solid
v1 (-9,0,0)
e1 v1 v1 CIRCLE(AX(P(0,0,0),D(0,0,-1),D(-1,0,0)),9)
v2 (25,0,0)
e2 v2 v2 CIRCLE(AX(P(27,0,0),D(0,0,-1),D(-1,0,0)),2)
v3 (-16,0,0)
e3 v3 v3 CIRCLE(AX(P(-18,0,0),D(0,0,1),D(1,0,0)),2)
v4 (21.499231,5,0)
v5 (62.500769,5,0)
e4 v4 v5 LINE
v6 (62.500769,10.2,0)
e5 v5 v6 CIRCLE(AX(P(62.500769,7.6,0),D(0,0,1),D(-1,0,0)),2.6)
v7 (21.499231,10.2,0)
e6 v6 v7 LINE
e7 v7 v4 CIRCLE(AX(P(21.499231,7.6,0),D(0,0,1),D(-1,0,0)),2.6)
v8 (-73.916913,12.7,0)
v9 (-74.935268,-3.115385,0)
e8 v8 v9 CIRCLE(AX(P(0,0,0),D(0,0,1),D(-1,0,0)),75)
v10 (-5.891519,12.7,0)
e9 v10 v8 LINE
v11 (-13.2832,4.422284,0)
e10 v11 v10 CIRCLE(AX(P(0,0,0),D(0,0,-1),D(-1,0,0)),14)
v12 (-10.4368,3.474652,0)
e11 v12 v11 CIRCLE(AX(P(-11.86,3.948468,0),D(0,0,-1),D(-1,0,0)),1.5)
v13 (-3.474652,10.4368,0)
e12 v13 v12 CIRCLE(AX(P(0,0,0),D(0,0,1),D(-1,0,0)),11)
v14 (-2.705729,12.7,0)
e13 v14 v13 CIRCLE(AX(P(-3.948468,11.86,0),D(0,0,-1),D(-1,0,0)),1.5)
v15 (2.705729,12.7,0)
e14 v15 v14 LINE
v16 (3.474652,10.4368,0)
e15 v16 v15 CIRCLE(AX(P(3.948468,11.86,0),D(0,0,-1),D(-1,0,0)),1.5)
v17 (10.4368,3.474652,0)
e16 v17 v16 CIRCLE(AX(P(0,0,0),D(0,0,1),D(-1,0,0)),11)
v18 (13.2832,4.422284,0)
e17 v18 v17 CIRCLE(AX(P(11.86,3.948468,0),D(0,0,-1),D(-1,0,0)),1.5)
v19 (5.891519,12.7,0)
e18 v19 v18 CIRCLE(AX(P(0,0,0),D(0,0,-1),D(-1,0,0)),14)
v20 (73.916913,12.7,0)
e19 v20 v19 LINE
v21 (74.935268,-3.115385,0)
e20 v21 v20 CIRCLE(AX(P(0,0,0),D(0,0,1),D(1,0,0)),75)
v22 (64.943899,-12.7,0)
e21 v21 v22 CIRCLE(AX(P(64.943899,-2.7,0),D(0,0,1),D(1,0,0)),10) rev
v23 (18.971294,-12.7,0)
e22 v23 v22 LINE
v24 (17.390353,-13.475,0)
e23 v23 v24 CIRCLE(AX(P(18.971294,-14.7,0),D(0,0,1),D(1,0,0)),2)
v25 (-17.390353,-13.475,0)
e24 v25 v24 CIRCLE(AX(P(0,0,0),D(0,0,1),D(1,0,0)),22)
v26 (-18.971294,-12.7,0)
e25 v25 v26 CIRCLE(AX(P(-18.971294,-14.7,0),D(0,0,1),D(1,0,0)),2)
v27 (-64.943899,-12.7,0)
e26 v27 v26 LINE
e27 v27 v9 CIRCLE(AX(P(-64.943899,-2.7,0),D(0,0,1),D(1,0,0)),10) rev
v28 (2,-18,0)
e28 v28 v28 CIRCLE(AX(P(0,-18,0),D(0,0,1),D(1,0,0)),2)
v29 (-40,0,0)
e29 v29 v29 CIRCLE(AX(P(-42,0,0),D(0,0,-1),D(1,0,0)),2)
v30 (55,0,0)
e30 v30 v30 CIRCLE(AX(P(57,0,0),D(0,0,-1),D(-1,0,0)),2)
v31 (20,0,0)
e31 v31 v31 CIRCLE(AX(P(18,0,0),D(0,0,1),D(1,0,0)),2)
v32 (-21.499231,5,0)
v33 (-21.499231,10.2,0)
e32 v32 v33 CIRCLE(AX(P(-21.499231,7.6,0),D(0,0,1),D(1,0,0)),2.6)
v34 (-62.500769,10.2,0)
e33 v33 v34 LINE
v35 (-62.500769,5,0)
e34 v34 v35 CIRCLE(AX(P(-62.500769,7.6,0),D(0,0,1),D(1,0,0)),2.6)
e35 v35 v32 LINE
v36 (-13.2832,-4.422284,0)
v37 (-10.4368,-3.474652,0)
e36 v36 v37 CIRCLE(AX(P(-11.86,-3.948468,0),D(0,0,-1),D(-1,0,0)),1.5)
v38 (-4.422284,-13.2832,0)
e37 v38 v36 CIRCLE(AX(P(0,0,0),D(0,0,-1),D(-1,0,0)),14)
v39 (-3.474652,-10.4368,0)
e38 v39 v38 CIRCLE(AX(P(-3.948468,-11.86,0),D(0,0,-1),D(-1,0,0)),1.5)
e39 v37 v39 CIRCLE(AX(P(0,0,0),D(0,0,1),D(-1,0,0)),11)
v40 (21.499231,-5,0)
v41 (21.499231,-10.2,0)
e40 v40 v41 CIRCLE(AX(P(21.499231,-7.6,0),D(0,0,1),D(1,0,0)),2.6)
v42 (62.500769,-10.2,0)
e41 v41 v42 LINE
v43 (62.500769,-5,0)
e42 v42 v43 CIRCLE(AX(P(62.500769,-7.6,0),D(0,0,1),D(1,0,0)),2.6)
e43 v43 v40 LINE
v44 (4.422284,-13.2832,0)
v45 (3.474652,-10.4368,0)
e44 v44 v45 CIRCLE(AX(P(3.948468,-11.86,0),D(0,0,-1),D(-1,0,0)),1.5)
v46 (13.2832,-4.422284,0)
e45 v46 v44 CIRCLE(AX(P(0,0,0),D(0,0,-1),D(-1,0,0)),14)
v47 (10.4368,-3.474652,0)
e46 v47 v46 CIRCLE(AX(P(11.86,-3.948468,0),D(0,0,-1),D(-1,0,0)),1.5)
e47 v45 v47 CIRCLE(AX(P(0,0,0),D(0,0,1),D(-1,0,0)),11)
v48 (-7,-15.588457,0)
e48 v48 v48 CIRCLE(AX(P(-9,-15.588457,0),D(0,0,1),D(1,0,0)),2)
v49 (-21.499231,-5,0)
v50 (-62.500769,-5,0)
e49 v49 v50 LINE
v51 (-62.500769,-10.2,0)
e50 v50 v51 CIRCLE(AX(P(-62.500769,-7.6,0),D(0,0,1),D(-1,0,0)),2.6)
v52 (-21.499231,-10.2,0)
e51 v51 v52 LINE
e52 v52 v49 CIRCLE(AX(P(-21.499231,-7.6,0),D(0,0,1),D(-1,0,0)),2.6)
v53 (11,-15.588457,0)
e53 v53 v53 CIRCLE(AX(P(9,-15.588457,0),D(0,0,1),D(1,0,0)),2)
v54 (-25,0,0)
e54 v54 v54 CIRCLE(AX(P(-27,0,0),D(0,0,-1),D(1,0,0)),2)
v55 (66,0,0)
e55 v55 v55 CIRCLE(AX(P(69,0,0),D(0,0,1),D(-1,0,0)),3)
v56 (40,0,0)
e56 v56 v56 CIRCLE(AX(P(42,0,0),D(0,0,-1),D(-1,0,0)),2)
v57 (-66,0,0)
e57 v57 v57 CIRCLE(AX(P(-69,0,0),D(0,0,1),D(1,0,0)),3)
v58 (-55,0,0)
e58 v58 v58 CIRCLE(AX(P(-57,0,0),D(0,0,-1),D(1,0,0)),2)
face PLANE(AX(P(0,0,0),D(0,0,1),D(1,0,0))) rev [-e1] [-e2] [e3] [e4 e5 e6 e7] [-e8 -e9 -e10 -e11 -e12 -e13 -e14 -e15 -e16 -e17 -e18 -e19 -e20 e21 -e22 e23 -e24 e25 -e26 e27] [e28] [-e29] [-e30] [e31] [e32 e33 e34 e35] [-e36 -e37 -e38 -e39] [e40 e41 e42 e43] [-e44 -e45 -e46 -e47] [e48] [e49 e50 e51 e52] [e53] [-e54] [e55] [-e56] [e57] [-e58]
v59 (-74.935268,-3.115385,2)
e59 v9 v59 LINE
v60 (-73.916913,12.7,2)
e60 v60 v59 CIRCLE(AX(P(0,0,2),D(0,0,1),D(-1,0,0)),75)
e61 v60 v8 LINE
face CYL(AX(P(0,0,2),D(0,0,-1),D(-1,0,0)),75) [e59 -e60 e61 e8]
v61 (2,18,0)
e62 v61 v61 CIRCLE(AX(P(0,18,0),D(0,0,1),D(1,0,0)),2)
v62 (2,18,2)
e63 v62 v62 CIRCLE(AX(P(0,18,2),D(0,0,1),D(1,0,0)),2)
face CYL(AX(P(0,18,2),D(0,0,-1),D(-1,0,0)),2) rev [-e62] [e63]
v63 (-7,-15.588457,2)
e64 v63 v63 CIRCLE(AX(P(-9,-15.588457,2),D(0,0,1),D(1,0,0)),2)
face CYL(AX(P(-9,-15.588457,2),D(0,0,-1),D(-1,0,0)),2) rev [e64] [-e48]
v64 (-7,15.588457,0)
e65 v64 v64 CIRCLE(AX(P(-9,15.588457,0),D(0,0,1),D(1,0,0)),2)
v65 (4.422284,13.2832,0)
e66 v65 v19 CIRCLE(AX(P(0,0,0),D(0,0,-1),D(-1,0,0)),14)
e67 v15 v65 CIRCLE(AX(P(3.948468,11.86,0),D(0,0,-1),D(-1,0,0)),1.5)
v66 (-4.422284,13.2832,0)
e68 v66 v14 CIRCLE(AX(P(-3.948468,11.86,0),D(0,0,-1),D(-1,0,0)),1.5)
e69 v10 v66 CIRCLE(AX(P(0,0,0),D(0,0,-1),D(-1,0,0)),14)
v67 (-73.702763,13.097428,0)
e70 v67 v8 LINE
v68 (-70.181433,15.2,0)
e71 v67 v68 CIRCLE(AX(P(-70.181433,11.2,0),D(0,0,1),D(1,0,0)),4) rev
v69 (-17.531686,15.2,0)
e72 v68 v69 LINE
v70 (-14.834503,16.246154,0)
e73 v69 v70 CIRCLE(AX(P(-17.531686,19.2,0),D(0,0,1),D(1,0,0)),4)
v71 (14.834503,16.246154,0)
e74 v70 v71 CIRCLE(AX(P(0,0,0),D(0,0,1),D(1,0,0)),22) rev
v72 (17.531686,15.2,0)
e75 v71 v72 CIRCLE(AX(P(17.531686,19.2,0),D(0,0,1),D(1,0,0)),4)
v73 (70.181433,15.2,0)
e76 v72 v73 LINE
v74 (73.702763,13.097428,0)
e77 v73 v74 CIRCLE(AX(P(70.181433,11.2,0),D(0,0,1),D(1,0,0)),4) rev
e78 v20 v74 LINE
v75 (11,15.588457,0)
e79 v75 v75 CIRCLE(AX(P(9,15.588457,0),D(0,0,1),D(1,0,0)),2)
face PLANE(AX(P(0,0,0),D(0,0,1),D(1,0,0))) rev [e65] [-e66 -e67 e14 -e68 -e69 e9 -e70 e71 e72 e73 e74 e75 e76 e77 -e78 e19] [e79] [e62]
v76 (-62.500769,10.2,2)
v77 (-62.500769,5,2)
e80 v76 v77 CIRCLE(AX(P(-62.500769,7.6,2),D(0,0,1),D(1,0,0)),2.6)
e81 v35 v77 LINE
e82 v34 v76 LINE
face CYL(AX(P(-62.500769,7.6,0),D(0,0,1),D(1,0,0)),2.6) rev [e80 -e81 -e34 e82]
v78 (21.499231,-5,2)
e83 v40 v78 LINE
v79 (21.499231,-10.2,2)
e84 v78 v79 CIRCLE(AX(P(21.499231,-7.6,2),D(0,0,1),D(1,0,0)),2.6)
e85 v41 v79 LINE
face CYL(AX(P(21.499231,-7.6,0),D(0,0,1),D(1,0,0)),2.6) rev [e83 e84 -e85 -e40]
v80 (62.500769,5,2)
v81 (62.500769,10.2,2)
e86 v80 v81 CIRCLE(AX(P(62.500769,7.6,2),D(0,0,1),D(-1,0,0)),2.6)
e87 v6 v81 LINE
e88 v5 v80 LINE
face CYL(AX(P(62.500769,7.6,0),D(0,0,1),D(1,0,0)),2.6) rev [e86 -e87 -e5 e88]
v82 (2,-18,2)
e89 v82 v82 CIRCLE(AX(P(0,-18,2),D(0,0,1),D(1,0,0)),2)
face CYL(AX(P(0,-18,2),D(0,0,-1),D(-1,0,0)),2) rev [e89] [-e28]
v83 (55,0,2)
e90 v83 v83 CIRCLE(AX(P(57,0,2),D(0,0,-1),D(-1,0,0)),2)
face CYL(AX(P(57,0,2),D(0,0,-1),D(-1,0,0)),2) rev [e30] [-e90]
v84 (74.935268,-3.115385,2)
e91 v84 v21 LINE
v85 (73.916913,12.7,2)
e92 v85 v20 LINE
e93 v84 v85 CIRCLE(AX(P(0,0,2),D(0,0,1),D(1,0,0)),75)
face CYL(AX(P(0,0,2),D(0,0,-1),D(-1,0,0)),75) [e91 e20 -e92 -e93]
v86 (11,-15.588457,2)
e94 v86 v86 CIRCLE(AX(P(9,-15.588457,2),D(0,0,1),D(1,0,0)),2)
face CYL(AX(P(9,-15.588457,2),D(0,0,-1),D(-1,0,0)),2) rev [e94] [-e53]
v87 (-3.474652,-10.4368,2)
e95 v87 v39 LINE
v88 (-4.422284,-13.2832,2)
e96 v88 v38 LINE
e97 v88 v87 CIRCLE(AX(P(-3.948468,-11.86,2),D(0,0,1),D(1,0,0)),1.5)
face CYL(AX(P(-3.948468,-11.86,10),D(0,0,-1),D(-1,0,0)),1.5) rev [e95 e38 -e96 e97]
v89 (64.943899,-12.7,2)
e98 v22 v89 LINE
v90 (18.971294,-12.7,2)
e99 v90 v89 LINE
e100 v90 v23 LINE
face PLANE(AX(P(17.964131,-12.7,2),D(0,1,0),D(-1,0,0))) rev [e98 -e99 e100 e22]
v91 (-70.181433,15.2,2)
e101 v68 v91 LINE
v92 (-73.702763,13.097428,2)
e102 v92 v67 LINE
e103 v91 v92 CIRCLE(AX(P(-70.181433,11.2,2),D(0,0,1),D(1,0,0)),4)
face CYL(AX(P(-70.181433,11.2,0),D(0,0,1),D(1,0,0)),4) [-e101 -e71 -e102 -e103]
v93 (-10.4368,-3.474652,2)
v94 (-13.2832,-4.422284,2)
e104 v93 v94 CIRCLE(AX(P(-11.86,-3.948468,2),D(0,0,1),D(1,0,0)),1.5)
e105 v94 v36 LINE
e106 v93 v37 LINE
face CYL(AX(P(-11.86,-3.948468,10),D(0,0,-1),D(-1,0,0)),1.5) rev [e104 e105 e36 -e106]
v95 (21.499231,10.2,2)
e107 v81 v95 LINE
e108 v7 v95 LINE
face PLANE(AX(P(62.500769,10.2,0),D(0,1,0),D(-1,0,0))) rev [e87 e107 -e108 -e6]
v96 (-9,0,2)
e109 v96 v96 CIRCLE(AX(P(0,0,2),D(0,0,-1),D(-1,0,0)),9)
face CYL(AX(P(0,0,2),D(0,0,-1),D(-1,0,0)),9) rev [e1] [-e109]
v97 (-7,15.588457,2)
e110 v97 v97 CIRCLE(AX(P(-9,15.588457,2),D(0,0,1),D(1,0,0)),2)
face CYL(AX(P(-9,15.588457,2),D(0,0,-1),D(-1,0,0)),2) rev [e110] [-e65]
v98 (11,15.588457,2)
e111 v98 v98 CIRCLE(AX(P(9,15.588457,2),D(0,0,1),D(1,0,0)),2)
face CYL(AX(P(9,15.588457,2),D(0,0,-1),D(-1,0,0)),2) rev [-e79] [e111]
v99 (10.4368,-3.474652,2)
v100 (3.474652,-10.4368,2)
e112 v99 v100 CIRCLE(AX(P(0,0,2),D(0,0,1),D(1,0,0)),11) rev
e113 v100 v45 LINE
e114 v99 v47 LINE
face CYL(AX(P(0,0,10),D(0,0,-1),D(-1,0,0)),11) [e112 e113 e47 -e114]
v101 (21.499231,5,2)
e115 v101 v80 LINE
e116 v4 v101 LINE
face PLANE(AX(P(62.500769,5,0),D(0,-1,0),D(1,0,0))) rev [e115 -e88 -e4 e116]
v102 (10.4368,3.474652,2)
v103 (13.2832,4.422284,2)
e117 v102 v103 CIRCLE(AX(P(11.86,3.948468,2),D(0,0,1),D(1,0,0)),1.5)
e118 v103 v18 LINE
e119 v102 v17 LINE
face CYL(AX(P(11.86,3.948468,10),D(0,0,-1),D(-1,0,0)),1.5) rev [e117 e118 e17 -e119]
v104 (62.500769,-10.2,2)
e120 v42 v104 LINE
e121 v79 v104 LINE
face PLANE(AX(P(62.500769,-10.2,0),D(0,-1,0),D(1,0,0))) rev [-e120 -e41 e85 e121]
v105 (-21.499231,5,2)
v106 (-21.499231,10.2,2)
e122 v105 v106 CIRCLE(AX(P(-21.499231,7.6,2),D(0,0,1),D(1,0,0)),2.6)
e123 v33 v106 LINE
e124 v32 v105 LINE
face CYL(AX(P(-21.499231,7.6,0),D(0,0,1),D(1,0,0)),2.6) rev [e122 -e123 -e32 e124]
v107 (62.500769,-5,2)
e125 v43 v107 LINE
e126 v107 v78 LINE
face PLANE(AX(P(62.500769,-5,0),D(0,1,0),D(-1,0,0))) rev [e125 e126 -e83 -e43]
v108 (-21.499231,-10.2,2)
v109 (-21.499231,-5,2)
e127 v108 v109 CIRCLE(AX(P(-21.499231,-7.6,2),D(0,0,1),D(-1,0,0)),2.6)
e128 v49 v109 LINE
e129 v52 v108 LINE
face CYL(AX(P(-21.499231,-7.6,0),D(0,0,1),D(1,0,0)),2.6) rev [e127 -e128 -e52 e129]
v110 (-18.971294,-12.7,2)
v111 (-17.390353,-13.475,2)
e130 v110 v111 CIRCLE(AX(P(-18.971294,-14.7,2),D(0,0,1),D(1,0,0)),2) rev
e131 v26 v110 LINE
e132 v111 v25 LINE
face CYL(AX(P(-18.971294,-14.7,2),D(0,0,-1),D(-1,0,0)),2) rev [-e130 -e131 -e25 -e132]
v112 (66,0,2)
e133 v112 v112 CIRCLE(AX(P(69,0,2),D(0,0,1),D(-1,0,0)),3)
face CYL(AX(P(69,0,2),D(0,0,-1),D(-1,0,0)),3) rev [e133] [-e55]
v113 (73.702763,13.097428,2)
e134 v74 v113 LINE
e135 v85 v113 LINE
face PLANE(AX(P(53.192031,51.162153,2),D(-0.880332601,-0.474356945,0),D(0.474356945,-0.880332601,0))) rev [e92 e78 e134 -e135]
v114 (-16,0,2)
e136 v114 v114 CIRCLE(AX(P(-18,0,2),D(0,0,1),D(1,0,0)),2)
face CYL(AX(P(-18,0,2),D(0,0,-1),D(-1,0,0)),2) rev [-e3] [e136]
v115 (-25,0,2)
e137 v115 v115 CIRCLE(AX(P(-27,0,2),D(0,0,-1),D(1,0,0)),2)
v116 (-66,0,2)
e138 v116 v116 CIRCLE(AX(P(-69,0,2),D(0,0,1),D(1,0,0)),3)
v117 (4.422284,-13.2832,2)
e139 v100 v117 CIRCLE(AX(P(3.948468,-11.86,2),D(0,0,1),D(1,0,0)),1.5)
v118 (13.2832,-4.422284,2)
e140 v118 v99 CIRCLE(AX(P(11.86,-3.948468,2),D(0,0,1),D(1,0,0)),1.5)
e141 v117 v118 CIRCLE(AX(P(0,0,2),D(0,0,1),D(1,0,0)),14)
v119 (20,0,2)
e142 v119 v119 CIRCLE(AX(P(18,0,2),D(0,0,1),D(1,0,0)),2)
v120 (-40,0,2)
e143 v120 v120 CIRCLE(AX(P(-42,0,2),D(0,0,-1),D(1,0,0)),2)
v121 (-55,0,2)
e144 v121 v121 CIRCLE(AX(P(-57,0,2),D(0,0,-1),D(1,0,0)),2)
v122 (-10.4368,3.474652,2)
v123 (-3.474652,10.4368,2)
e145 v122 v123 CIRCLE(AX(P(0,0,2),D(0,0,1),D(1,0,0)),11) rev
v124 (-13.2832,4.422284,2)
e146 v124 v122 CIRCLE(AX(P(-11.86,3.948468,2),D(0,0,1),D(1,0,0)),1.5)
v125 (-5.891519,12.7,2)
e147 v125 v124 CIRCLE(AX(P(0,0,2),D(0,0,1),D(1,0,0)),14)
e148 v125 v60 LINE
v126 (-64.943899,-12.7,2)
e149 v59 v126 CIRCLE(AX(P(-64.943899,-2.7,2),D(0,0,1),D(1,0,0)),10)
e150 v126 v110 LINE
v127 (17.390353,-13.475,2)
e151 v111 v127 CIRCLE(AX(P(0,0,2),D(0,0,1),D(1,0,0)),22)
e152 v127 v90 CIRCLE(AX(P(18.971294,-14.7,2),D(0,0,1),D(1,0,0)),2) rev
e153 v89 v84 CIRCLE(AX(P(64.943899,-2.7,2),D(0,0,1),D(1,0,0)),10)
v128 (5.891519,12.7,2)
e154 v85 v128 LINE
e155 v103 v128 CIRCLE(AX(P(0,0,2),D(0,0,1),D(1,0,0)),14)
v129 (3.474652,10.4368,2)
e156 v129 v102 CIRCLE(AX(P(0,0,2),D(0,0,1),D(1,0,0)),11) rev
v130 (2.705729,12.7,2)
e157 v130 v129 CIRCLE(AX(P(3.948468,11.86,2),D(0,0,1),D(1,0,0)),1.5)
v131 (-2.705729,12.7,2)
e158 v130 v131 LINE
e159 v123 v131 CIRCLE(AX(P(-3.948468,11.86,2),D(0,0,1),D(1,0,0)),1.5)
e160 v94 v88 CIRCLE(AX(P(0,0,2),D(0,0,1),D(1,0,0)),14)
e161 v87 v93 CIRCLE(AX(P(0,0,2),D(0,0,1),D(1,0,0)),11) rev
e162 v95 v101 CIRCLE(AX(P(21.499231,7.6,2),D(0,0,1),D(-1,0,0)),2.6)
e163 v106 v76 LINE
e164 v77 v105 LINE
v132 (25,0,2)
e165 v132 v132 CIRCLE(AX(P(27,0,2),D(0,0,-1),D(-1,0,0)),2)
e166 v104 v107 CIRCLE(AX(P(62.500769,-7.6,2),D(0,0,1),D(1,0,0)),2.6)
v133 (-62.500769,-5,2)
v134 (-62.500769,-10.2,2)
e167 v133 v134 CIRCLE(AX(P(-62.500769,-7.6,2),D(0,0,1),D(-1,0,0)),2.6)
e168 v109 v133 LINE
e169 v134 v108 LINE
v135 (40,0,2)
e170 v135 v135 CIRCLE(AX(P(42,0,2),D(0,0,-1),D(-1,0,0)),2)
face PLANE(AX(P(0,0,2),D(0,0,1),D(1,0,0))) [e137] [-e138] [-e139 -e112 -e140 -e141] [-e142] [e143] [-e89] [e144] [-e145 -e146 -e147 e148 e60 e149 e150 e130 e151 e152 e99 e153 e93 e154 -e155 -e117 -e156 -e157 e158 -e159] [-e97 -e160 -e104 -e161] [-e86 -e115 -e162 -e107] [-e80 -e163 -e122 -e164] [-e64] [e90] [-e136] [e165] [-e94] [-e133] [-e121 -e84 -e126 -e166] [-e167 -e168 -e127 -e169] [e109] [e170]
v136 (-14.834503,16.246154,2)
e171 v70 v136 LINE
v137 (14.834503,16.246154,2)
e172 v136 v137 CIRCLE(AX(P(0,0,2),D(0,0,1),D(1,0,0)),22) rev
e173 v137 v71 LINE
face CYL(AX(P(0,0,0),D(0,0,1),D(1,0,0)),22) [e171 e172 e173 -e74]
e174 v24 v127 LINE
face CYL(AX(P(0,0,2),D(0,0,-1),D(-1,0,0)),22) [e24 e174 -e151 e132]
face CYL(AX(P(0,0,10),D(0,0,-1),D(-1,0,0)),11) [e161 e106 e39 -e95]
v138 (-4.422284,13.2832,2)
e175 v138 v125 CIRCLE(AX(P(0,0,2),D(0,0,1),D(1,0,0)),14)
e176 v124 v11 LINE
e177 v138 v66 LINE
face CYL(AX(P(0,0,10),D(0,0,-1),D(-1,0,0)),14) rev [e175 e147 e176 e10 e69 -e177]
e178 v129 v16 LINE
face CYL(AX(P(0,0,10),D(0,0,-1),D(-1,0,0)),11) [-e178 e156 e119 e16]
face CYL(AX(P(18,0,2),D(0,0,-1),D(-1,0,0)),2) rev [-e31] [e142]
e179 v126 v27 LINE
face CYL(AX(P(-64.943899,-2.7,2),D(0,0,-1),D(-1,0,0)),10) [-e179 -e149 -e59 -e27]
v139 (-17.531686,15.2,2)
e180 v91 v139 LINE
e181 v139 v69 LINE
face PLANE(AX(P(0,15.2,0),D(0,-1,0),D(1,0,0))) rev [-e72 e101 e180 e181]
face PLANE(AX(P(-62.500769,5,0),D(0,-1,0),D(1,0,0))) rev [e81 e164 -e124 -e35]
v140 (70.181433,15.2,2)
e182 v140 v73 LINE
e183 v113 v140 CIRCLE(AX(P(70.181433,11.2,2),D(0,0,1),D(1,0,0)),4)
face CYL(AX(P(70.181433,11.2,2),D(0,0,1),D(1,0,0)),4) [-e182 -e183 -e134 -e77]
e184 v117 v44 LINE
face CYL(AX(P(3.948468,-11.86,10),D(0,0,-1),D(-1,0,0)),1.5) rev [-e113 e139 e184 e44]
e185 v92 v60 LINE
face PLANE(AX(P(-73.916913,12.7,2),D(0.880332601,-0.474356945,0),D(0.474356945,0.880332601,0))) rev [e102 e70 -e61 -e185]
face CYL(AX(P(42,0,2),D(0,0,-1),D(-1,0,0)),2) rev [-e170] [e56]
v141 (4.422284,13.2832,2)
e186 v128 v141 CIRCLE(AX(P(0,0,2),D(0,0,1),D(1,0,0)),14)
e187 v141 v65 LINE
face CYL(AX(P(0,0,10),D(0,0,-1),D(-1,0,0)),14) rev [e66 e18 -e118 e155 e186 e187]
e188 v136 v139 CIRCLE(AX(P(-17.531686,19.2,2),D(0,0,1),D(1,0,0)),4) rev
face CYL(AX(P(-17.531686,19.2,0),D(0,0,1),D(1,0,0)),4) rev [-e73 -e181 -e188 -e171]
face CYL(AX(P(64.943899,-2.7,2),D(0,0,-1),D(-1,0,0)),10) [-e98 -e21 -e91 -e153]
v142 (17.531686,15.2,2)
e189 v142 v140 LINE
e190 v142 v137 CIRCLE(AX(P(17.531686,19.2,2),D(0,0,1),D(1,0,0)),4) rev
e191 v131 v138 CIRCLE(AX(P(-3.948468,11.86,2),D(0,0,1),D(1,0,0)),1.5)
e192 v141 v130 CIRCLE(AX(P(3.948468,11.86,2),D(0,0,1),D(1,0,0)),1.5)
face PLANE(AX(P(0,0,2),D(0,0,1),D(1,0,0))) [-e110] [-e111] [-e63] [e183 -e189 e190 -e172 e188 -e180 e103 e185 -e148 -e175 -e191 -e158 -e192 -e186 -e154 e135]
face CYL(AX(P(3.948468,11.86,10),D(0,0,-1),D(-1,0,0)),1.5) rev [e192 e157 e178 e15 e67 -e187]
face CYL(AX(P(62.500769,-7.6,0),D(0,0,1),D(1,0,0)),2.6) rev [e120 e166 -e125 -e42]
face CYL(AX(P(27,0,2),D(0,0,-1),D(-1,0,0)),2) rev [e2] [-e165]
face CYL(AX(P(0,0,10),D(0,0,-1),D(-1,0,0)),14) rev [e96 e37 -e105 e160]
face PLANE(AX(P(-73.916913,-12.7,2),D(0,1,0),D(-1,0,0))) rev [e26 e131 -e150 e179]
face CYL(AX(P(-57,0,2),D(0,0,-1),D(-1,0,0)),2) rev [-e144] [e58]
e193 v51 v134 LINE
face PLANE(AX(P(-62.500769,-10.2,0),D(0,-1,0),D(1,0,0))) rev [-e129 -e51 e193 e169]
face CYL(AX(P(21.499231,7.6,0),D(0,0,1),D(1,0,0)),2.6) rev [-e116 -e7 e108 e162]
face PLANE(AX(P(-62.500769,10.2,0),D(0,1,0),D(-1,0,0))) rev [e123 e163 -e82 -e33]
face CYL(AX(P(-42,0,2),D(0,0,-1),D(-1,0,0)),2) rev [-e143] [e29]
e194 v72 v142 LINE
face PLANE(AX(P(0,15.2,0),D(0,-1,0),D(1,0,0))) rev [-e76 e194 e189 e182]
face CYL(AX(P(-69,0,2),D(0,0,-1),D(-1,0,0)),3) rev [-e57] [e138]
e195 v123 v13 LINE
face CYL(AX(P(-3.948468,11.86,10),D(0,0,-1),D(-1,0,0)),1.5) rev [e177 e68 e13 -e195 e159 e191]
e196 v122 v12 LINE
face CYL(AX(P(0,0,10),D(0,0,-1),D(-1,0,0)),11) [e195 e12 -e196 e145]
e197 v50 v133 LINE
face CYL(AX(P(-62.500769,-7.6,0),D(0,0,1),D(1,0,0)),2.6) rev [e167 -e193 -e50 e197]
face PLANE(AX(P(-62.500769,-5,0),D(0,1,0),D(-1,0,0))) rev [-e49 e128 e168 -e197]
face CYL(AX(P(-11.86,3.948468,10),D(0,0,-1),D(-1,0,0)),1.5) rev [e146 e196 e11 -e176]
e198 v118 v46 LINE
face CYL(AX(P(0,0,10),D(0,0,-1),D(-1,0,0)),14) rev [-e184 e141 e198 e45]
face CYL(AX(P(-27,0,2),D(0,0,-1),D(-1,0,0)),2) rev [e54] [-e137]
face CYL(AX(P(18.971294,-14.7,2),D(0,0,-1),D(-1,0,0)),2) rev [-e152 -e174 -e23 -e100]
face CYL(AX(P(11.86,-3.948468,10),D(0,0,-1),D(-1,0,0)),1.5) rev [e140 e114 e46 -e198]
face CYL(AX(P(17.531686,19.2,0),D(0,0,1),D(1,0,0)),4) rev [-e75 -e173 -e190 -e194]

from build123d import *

# Parameters (mm, degrees)
SKETCH1_R           = 2
SKETCH1_R_2         = 3
BOSS_EXTRUDE1_DEPTH = 2
SKETCH3_R           = 9
SKETCH3_R_2         = 2
CUT_EXTRUDE1_DEPTH  = 93.316865626
CUT_EXTRUDE2_DEPTH  = 93.316865626
CUT_EXTRUDE3_DEPTH  = 93.316865626
FILLET1_R           = 2
FILLET2_DEPTH       = 2
FILLET3_DEPTH       = 2
FILLET4_DEPTH       = 2
FILLET5_DEPTH       = 2
FILLET6_R           = 10
CUT_EXTRUDE4_DEPTH  = 10
CUT_EXTRUDE5_START  = -10
CUT_EXTRUDE5_DEPTH  = 10
FILLET7_R           = 4


with BuildPart() as part:
    # Sketch1 → Boss-Extrude1 (new body)
    with BuildSketch(Plane.XY):
        with BuildLine():
            Line((-73.916912814, -12.7), (-17.964130928, -12.7))
            ThreePointArc((-17.964130928, -12.7), (0, -22), (17.964130928, -12.7))
            Line((17.964130928, -12.7), (73.916912814, -12.7))
            ThreePointArc((73.916912814, -12.7), (75, 0), (73.916912814, 12.7))
            Line((73.916912814, 12.7), (53.192030909, 51.162152625))
            ThreePointArc((53.192030909, 51.162152625), (51.353674008, 53.083322806), (48.790367902, 53.790367902))
            Line((48.790367902, 53.790367902), (-48.790367902, 53.790367902))
            ThreePointArc((-48.790367902, 53.790367902), (-51.353674008, 53.083322806), (-53.192030909, 51.162152625))
            Line((-53.192030909, 51.162152625), (-73.916912814, 12.7))
            ThreePointArc((-73.916912814, 12.7), (-75, 0), (-73.916912814, -12.7))
        make_face()
        with Locations((0, 18)):
            Circle(SKETCH1_R, mode=Mode.SUBTRACT)
        with Locations((-48.790367902, 48.790367902)):
            Circle(SKETCH1_R_2, mode=Mode.SUBTRACT)
        with Locations((-69, 0)):
            Circle(SKETCH1_R_2, mode=Mode.SUBTRACT)
        with Locations(Location((69, 0, 0), (0, 0, 180))):
            Circle(SKETCH1_R_2, mode=Mode.SUBTRACT)
        with Locations(Location((48.790367902, 48.790367902, 0), (0, 0, 180))):
            Circle(SKETCH1_R_2, mode=Mode.SUBTRACT)
        with Locations((9, 15.588457268)):
            Circle(SKETCH1_R, mode=Mode.SUBTRACT)
        with Locations((18, 0)):
            Circle(SKETCH1_R, mode=Mode.SUBTRACT)
        with Locations((9, -15.588457268)):
            Circle(SKETCH1_R, mode=Mode.SUBTRACT)
        with Locations((0, -18)):
            Circle(SKETCH1_R, mode=Mode.SUBTRACT)
        with Locations((-9, -15.588457268)):
            Circle(SKETCH1_R, mode=Mode.SUBTRACT)
        with Locations((-18, 0)):
            Circle(SKETCH1_R, mode=Mode.SUBTRACT)
        with Locations((-9, 15.588457268)):
            Circle(SKETCH1_R, mode=Mode.SUBTRACT)
    extrude(amount=BOSS_EXTRUDE1_DEPTH)

    # Sketch3 → Cut-Extrude1 (cut, through all)
    with BuildSketch(Plane(origin=(0, 0, 0), x_dir=(-1, 0, 0), z_dir=(0, 0, -1))):
        Circle(SKETCH3_R)
        with Locations((-57, 0)):
            Circle(SKETCH3_R_2)
        with Locations((-42, 0)):
            Circle(SKETCH3_R_2)
        with Locations((-27, 0)):
            Circle(SKETCH3_R_2)
        with Locations(Location((27, 0, 0), (0, 0, 180))):
            Circle(SKETCH3_R_2)
        with Locations(Location((42, 0, 0), (0, 0, 180))):
            Circle(SKETCH3_R_2)
        with Locations(Location((57, 0, 0), (0, 0, 180))):
            Circle(SKETCH3_R_2)
    extrude(amount=-CUT_EXTRUDE1_DEPTH, mode=Mode.SUBTRACT)

    # Sketch5 → Cut-Extrude2 (cut, through all)
    with BuildSketch(Plane.XY.offset(2)):
        with BuildLine():
            ThreePointArc((-47.496272676, 43.96073877), (-49.370145803, 43.824095901), (-51.162152625, 44.388704895))
            Line((-51.162152625, 44.388704895), (-66.890145486, 15.2))
            Line((-66.890145486, 15.2), (-18.735533906, 15.2))
            Line((-18.735533906, 15.2), (-47.496272676, 43.96073877))
        make_face()
        with BuildLine():
            ThreePointArc((43.96073877, 47.496272676), (43.833143595, 48.137736941), (43.790367902, 48.790367902))
            Line((43.790367902, 48.790367902), (-43.790367902, 48.790367902))
            ThreePointArc((-43.790367902, 48.790367902), (-43.833143595, 48.137736941), (-43.96073877, 47.496272676))
            Line((-43.96073877, 47.496272676), (-13.687814563, 17.223348469))
            ThreePointArc((-13.687814563, 17.223348469), (0, 22), (13.687814563, 17.223348469))
            Line((13.687814563, 17.223348469), (43.96073877, 47.496272676))
        make_face()
        with BuildLine():
            Line((47.496272676, 43.96073877), (18.735533906, 15.2))
            Line((18.735533906, 15.2), (66.890145486, 15.2))
            Line((66.890145486, 15.2), (51.162152625, 44.388704895))
            ThreePointArc((51.162152625, 44.388704895), (49.370145803, 43.824095901), (47.496272676, 43.96073877))
        make_face()
    extrude(amount=-CUT_EXTRUDE2_DEPTH, mode=Mode.SUBTRACT)

    # Sketch8 → Cut-Extrude3 (cut, through all)
    with BuildSketch(Plane.XY.offset(2)):
        with BuildLine():
            Line((-62.500769276, 10.2), (-21.499230724, 10.2))
            ThreePointArc((-21.499230724, 10.2), (-18.899230724, 7.6), (-21.499230724, 5))
            Line((-21.499230724, 5), (-62.500769276, 5))
            ThreePointArc((-62.500769276, 5), (-65.100769276, 7.6), (-62.500769276, 10.2))
        make_face()
        with BuildLine():
            Line((62.500769276, 10.2), (21.499230724, 10.2))
            ThreePointArc((21.499230724, 10.2), (18.899230724, 7.6), (21.499230724, 5))
            Line((21.499230724, 5), (62.500769276, 5))
            ThreePointArc((62.500769276, 5), (65.100769276, 7.6), (62.500769276, 10.2))
        make_face()
        with BuildLine():
            Line((-62.500769276, -10.2), (-21.499230724, -10.2))
            ThreePointArc((-21.499230724, -10.2), (-18.899230724, -7.6), (-21.499230724, -5))
            Line((-21.499230724, -5), (-62.500769276, -5))
            ThreePointArc((-62.500769276, -5), (-65.100769276, -7.6), (-62.500769276, -10.2))
        make_face()
        with BuildLine():
            Line((62.500769276, -10.2), (21.499230724, -10.2))
            ThreePointArc((21.499230724, -10.2), (18.899230724, -7.6), (21.499230724, -5))
            Line((21.499230724, -5), (62.500769276, -5))
            ThreePointArc((62.500769276, -5), (65.100769276, -7.6), (62.500769276, -10.2))
        make_face()
    extrude(amount=-CUT_EXTRUDE3_DEPTH, mode=Mode.SUBTRACT)

    # Fillet1
    fillet1_edges = [part.edges().sort_by_distance(p)[0] for p in [
        (13.687814563, 17.223348469, 1),
        (-13.687814563, 17.223348469, 1),
        (66.890145486, 15.2, 1),
        (18.735533906, 15.2, 1),
        (-18.735533906, 15.2, 1),
        (-66.890145486, 15.2, 1),
        (-17.964130928, -12.7, 1),
        (17.964130928, -12.7, 1),
    ]]
    fillet(fillet1_edges, radius=FILLET1_R)

    # Fillet2: read off the stored shape, not the designer's step
    # Fillet2 outline → Fillet2 (add)
    with BuildSketch(Plane.XY):
        with BuildLine():
            Line((-43.96073877, 47.496272676), (-43.584387401, 47.119921307))
            add(Edge.make_bspline(
                [(-43.584387401, 47.119921307), (-43.797190051, 47.332723957), (-43.913795064, 47.634492396), (-43.857793167, 47.972011936)],
                knots=[0, 0, 0, 0, 0.414217716, 0.414217716, 0.414217716, 0.414217716], degree=3, weights=[1, 0.829531028, 0.729673324, 0.700426888]))
            ThreePointArc((-43.857793167, 47.972011936), (-43.903473382, 47.732888844), (-43.96073877, 47.496272676))
        make_face()
        with BuildLine():
            ThreePointArc((-43.790367902, 48.790367902), (-43.807252728, 48.379803457), (-43.857793167, 47.972011936))
            add(Edge.make_bspline(
                [(-43.857793167, 47.972011936), (-43.770111404, 48.500463831), (-43.357659227, 48.790367902), (-42.892465766, 48.790367902)],
                knots=[0.414217716, 0.414217716, 0.414217716, 0.414217716, 1, 1, 1, 1], degree=3, weights=[0.700426888, 0.65906689, 0.758924594, 1]))
            Line((-42.892465766, 48.790367902), (-43.790367902, 48.790367902))
        make_face()
    extrude(amount=FILLET2_DEPTH)

    # Fillet3: read off the stored shape, not the designer's step
    # Fillet3 outline → Fillet3 (add)
    with BuildSketch(Plane.XY):
        with BuildLine():
            Line((43.790367902, 48.790367902), (42.892465766, 48.790367902))
            add(Edge.make_bspline(
                [(42.892465766, 48.790367902), (43.35766565, 48.790367902), (43.770121357, 48.500456835), (43.85779576, 47.971996305)],
                knots=[0, 0, 0, 0, 0.585788422, 0.585788422, 0.585788422, 0.585788422], degree=3, weights=[1, 0.758922068, 0.659064797, 0.700428188]))
            ThreePointArc((43.85779576, 47.971996305), (43.807253379, 48.379795562), (43.790367902, 48.790367902))
        make_face()
        with BuildLine():
            ThreePointArc((43.96073877, 47.496272676), (43.903475058, 47.732881101), (43.85779576, 47.971996305))
            add(Edge.make_bspline(
                [(43.85779576, 47.971996305), (43.913791135, 47.634482229), (43.79718625, 47.332720155), (43.584387401, 47.119921307)],
                knots=[0.585788422, 0.585788422, 0.585788422, 0.585788422, 1, 1, 1, 1], degree=3, weights=[0.700428188, 0.729676283, 0.829533554, 1]))
            Line((43.584387401, 47.119921307), (43.96073877, 47.496272676))
        make_face()
    extrude(amount=FILLET3_DEPTH)

    # Fillet4: read off the stored shape, not the designer's step
    # Fillet4 outline → Fillet4 (add)
    with BuildSketch(Plane.XY):
        with BuildLine():
            Line((-51.162152625, 44.388704895), (-52.646203655, 41.634537345))
            add(Edge.make_bspline(
                [(-52.646203655, 41.634537345), (-51.921831722, 42.978858822), (-50.57662478, 43.835731972), (-48.922110647, 43.792103818)],
                knots=[0, 0, 0, 0, 0.585789591, 0.585789591, 0.585789591, 0.585789591], degree=3, weights=[1, 0.842636483, 0.777454876, 0.80445518]))
            ThreePointArc((-48.922110647, 43.792103818), (-50.077183995, 43.95879421), (-51.162152625, 44.388704895))
        make_face()
        with BuildLine():
            ThreePointArc((-47.496272676, 43.96073877), (-48.203107092, 43.824975194), (-48.922110647, 43.792103818))
            add(Edge.make_bspline(
                [(-48.922110647, 43.792103818), (-47.817684638, 43.762981028), (-46.849975542, 43.314441636), (-46.126053507, 42.590519601)],
                knots=[0.585789591, 0.585789591, 0.585789591, 0.585789591, 1, 1, 1, 1], degree=3, weights=[0.80445518, 0.823547029, 0.888728636, 1]))
            Line((-46.126053507, 42.590519601), (-47.496272676, 43.96073877))
        make_face()
    extrude(amount=FILLET4_DEPTH)

    # Fillet5: read off the stored shape, not the designer's step
    # Fillet5 outline → Fillet5 (add)
    with BuildSketch(Plane.XY):
        with BuildLine():
            Line((47.496272676, 43.96073877), (46.126053507, 42.590519601))
            add(Edge.make_bspline(
                [(46.126053507, 42.590519601), (46.849974415, 43.314440509), (47.81768175, 43.762979689), (48.922105957, 43.792103694)],
                knots=[0, 0, 0, 0, 0.414209836, 0.414209836, 0.414209836, 0.414209836], degree=3, weights=[1, 0.88872879, 0.823547209, 0.804455259]))
            ThreePointArc((48.922105957, 43.792103694), (48.203104762, 43.824975469), (47.496272676, 43.96073877))
        make_face()
        with BuildLine():
            ThreePointArc((51.162152625, 44.388704895), (50.077181728, 43.958793606), (48.922105957, 43.792103694))
            add(Edge.make_bspline(
                [(48.922105957, 43.792103694), (50.576621929, 43.835733788), (51.921830881, 42.978860382), (52.646203655, 41.634537345)],
                knots=[0.414209836, 0.414209836, 0.414209836, 0.414209836, 1, 1, 1, 1], degree=3, weights=[0.804455259, 0.777454749, 0.842636329, 1]))
            Line((52.646203655, 41.634537345), (51.162152625, 44.388704895))
        make_face()
    extrude(amount=FILLET5_DEPTH)

    # Fillet6
    fillet6_edges = [part.edges().sort_by_distance(p)[0] for p in [
        (-73.916912814, -12.7, 1),
        (73.916912814, -12.7, 1),
    ]]
    fillet(fillet6_edges, radius=FILLET6_R)

    # Sketch9 → Cut-Extrude4 (cut)
    with BuildSketch(Plane(origin=(0, 0, 0), x_dir=(-1, 0, 0), z_dir=(0, 0, -1))):
        with BuildLine():
            ThreePointArc((10.4368, 3.47465189), (7.778174593, 7.778174593), (3.47465189, 10.4368))
            ThreePointArc((3.47465189, 10.4368), (2.525268057, 12.333816167), (4.422284224, 13.2832))
            ThreePointArc((4.422284224, 13.2832), (9.899494937, 9.899494937), (13.2832, 4.422284224))
            ThreePointArc((13.2832, 4.422284224), (12.333816167, 2.525268057), (10.4368, 3.47465189))
        make_face()
        with BuildLine():
            ThreePointArc((-4.422284224, 13.2832), (-9.899494937, 9.899494937), (-13.2832, 4.422284224))
            ThreePointArc((-13.2832, 4.422284224), (-12.333816167, 2.525268057), (-10.4368, 3.47465189))
            ThreePointArc((-10.4368, 3.47465189), (-7.778174593, 7.778174593), (-3.47465189, 10.4368))
            ThreePointArc((-3.47465189, 10.4368), (-2.525268057, 12.333816167), (-4.422284224, 13.2832))
        make_face()
        with BuildLine():
            ThreePointArc((3.47465189, -10.4368), (7.778174593, -7.778174593), (10.4368, -3.47465189))
            ThreePointArc((10.4368, -3.47465189), (12.333816167, -2.525268057), (13.2832, -4.422284224))
            ThreePointArc((13.2832, -4.422284224), (9.899494937, -9.899494937), (4.422284224, -13.2832))
            ThreePointArc((4.422284224, -13.2832), (2.525268057, -12.333816167), (3.47465189, -10.4368))
        make_face()
        with BuildLine():
            ThreePointArc((-10.4368, -3.47465189), (-7.778174593, -7.778174593), (-3.47465189, -10.4368))
            ThreePointArc((-3.47465189, -10.4368), (-2.525268057, -12.333816167), (-4.422284224, -13.2832))
            ThreePointArc((-4.422284224, -13.2832), (-9.899494937, -9.899494937), (-13.2832, -4.422284224))
            ThreePointArc((-13.2832, -4.422284224), (-12.333816167, -2.525268057), (-10.4368, -3.47465189))
        make_face()
    extrude(amount=-CUT_EXTRUDE4_DEPTH, mode=Mode.SUBTRACT)

    # Sketch10 → Cut-Extrude5 (cut)
    with BuildSketch(Plane.XY.offset(2).offset(CUT_EXTRUDE5_START)):
        with BuildLine():
            Line((-63.54060023, 15.2), (-72.569817001, 15.2))
            Line((-72.569817001, 15.2), (-53.192030909, 51.162152625))
            ThreePointArc((-53.192030909, 51.162152625), (-51.353674008, 53.083322806), (-48.790367902, 53.790367902))
            Line((-48.790367902, 53.790367902), (48.790367902, 53.790367902))
            ThreePointArc((48.790367902, 53.790367902), (51.353674008, 53.083322806), (53.192030909, 51.162152625))
            Line((53.192030909, 51.162152625), (72.569817001, 15.2))
            Line((72.569817001, 15.2), (15.904716282, 15.2))
            ThreePointArc((15.904716282, 15.2), (0, 22), (-15.904716282, 15.2))
            Line((-15.904716282, 15.2), (-63.54060023, 15.2))
        make_face()
    extrude(amount=CUT_EXTRUDE5_DEPTH, mode=Mode.SUBTRACT)

    # Fillet7
    fillet7_edges = [part.edges().sort_by_distance(p)[0] for p in [
        (-72.569817001, 15.2, 1),
        (72.569817001, 15.2, 1),
        (-15.904716282, 15.2, 1),
        (15.904716282, 15.2, 1),
    ]]
    fillet(fillet7_edges, radius=FILLET7_R)


solid = part.part
